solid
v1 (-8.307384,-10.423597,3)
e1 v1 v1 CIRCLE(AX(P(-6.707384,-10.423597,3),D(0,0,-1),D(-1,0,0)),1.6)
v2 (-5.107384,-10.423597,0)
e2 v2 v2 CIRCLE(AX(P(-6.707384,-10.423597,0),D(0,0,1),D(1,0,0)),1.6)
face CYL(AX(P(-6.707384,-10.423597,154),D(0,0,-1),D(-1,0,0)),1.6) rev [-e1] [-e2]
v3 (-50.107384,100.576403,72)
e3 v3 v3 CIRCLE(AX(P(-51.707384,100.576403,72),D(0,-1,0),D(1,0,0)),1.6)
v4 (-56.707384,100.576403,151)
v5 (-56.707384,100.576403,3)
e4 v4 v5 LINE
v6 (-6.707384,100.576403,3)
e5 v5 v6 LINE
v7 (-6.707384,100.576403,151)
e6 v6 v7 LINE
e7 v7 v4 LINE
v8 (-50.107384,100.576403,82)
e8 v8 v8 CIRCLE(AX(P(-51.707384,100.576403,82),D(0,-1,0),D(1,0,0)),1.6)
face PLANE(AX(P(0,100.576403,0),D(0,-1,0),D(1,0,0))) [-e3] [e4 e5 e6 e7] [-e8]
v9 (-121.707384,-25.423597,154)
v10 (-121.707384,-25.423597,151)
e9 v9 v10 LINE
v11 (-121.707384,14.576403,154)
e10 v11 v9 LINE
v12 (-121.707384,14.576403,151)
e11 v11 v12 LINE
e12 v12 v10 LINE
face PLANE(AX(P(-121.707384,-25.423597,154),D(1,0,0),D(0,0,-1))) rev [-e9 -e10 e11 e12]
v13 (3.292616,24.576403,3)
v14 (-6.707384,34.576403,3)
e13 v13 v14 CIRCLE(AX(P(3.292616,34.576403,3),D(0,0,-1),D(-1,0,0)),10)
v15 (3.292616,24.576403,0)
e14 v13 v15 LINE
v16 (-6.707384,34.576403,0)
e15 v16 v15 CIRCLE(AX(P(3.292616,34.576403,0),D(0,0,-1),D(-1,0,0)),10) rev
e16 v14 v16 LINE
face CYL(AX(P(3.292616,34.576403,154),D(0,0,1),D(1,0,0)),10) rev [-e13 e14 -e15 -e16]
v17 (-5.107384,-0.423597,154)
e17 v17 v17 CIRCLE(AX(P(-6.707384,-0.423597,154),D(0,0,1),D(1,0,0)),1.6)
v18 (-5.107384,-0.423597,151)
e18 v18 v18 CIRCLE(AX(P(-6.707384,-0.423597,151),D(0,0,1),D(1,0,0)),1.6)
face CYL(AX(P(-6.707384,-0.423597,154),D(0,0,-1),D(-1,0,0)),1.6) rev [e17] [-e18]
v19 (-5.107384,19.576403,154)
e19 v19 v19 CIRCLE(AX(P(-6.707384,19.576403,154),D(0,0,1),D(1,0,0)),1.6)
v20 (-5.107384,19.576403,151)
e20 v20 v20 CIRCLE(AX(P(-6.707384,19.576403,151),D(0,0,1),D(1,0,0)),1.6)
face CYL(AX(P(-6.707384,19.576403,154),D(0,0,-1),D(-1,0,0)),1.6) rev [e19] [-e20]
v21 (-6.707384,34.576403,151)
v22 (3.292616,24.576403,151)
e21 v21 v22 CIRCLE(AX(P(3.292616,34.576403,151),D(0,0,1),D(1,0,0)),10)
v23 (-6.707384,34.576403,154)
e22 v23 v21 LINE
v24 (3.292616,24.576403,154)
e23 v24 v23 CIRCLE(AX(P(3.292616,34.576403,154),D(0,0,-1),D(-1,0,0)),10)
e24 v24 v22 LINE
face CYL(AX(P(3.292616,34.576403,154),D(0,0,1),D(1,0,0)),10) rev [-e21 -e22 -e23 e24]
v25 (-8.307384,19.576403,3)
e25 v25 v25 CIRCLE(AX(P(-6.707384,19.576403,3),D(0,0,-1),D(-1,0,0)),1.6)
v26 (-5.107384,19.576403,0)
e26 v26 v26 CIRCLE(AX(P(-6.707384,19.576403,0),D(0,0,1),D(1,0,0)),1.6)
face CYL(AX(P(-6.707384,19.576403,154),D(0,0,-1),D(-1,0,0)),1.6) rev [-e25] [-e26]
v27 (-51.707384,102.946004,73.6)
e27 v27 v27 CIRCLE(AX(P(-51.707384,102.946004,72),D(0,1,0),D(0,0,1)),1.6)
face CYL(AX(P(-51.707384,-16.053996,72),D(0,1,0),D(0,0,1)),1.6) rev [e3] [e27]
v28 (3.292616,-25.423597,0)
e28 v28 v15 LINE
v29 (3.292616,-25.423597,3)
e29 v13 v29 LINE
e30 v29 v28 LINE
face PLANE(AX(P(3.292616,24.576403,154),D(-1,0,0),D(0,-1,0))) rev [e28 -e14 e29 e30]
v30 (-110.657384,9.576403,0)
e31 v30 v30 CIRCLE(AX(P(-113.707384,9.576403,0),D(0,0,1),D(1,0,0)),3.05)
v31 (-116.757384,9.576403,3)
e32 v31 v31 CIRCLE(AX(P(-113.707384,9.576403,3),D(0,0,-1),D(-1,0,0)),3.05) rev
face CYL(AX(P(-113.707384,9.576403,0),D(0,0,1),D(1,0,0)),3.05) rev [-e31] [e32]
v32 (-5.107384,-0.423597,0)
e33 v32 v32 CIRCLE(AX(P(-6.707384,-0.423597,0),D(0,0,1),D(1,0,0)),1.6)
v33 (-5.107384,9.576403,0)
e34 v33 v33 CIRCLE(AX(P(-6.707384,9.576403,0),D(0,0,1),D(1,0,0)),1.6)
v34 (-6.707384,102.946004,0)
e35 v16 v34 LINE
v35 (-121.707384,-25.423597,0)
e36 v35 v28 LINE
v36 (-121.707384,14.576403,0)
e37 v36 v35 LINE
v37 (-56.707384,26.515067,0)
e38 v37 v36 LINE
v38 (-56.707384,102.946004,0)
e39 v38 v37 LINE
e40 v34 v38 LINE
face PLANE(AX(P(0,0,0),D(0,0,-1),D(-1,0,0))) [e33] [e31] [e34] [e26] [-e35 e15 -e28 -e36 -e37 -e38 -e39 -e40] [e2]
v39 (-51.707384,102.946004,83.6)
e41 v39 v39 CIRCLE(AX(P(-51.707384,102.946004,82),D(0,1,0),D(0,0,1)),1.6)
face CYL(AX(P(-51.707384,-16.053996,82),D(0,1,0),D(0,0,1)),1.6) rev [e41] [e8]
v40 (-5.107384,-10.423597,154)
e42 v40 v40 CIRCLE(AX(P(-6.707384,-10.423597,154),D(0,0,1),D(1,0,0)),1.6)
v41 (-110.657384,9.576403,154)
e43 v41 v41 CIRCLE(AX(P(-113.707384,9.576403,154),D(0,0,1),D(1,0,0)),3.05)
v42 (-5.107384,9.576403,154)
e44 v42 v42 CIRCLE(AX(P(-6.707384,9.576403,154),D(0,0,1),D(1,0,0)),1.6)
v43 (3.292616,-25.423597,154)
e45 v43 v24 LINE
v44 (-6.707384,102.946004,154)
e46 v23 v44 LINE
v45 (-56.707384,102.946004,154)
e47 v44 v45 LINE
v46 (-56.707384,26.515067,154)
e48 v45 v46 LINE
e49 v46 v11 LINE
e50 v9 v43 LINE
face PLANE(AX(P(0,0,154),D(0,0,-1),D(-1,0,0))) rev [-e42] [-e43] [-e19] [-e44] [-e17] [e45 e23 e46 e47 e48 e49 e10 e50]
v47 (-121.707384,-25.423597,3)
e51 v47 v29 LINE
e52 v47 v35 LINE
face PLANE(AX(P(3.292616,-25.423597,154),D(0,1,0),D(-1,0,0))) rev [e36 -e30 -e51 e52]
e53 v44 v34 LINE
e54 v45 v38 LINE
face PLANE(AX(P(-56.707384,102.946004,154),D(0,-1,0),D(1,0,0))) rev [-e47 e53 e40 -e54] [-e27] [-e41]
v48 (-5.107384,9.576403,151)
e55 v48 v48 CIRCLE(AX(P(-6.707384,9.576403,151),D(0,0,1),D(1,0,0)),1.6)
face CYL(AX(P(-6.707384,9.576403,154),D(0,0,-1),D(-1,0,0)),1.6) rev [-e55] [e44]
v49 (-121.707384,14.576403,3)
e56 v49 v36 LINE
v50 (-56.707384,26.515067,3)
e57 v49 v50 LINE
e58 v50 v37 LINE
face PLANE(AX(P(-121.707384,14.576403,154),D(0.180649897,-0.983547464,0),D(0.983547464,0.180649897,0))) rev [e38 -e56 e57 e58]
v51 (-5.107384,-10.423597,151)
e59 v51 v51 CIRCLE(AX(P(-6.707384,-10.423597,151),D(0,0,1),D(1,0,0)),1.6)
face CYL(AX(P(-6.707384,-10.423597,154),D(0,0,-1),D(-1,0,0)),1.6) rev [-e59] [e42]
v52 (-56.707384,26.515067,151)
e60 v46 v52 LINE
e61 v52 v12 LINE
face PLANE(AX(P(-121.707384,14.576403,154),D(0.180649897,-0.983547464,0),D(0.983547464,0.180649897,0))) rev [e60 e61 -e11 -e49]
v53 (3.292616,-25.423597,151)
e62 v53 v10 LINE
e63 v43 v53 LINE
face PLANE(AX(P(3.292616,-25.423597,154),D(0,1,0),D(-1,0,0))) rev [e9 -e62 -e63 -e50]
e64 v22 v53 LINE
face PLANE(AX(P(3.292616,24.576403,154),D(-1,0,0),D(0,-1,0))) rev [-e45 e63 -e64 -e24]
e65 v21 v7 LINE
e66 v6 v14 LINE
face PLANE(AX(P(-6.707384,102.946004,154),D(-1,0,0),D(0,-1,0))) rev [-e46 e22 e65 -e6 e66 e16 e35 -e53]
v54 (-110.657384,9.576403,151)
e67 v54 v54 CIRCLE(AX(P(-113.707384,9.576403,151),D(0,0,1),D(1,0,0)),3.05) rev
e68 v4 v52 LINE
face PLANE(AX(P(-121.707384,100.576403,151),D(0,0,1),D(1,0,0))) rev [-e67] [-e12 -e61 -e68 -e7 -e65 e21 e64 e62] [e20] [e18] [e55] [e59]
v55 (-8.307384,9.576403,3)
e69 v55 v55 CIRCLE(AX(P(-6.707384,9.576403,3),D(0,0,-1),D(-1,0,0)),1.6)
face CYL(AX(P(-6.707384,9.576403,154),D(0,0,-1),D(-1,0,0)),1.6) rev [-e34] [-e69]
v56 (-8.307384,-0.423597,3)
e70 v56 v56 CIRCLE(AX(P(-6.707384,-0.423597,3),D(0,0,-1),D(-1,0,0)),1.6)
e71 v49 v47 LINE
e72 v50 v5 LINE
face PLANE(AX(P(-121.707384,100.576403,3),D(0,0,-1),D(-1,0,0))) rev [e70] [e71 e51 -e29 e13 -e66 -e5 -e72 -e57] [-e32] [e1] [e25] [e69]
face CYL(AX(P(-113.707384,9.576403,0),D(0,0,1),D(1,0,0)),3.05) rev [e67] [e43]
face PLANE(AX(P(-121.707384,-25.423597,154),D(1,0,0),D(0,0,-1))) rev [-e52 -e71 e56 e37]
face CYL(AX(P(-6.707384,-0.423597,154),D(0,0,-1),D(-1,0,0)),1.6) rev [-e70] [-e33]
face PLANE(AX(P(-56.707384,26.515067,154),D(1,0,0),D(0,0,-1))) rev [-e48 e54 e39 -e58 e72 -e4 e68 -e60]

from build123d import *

# Parameters (mm, degrees)
SKETCH_1_R          = 1.6
EXTRUDE_1_DEPTH     = 154
SKETCH_5_R          = 3.05
CUT_EXTRUDE_3_DEPTH = 222.645137515
SKETCH_6_W          = 125
SKETCH_6_H          = 148
CUT_EXTRUDE_5_DEPTH = 126
SKETCH_7_R          = 1.6
CUT_EXTRUDE_6_DEPTH = 119
FILLET_1_R          = 10


with BuildPart() as part:
    # 草图1 → 凸台-拉伸1 (new body)
    with BuildSketch(Plane.XY):
        Polygon((3.292616486, 24.576402747), (3.292616486, -25.423597253), (-121.707383514, -25.423597253), (-121.707383514, 14.576402747), (-56.707383514, 26.515067344), (-56.707383514, 102.946004208), (-6.707383514, 102.946004208), (-6.707383514, 24.576402747), align=None)
        with Locations((-6.707383514, -10.423597253)):
            Circle(SKETCH_1_R, mode=Mode.SUBTRACT)
        with Locations((-6.707383514, -0.423597253)):
            Circle(SKETCH_1_R, mode=Mode.SUBTRACT)
        with Locations((-6.707383514, 9.576402747)):
            Circle(SKETCH_1_R, mode=Mode.SUBTRACT)
        with Locations((-6.707383514, 19.576402747)):
            Circle(SKETCH_1_R, mode=Mode.SUBTRACT)
    extrude(amount=EXTRUDE_1_DEPTH)

    # 草图5 → 切除-拉伸3 (cut, through all)
    with BuildSketch(Plane.XY.offset(154)):
        with Locations((-113.707383514, 9.576402747)):
            Circle(SKETCH_5_R)
    extrude(amount=-CUT_EXTRUDE_3_DEPTH, mode=Mode.SUBTRACT)

    # 草图6 → 切除-拉伸5 (cut)
    with BuildSketch(Plane.XZ.offset(25.423597253)):
        with Locations((-59.207383514, 77)):
            Rectangle(SKETCH_6_W, SKETCH_6_H)
    extrude(amount=-CUT_EXTRUDE_5_DEPTH, mode=Mode.SUBTRACT)

    # 草图7 → 切除-拉伸6 (cut)
    with BuildSketch(Plane(origin=(0, 102.946004208, 0), x_dir=(1, 0, 0), z_dir=(0, 1, 0))):
        with Locations(Location((-51.707383514, -82, 0), (0, 0, 270))):
            Circle(SKETCH_7_R)
        with Locations(Location((-51.707383514, -72, 0), (0, 0, 270))):
            Circle(SKETCH_7_R)
    extrude(amount=-CUT_EXTRUDE_6_DEPTH, mode=Mode.SUBTRACT)

    # 圆角1
    fillet_1_edges = [part.edges().sort_by_distance(p)[0] for p in [
        (-6.707383514, 24.576402747, 1.5),
        (-6.707383514, 24.576402747, 152.5),
    ]]
    fillet(fillet_1_edges, radius=FILLET_1_R - 0.0001)  # a hair under: the kernel refuses the full size


solid = part.part
